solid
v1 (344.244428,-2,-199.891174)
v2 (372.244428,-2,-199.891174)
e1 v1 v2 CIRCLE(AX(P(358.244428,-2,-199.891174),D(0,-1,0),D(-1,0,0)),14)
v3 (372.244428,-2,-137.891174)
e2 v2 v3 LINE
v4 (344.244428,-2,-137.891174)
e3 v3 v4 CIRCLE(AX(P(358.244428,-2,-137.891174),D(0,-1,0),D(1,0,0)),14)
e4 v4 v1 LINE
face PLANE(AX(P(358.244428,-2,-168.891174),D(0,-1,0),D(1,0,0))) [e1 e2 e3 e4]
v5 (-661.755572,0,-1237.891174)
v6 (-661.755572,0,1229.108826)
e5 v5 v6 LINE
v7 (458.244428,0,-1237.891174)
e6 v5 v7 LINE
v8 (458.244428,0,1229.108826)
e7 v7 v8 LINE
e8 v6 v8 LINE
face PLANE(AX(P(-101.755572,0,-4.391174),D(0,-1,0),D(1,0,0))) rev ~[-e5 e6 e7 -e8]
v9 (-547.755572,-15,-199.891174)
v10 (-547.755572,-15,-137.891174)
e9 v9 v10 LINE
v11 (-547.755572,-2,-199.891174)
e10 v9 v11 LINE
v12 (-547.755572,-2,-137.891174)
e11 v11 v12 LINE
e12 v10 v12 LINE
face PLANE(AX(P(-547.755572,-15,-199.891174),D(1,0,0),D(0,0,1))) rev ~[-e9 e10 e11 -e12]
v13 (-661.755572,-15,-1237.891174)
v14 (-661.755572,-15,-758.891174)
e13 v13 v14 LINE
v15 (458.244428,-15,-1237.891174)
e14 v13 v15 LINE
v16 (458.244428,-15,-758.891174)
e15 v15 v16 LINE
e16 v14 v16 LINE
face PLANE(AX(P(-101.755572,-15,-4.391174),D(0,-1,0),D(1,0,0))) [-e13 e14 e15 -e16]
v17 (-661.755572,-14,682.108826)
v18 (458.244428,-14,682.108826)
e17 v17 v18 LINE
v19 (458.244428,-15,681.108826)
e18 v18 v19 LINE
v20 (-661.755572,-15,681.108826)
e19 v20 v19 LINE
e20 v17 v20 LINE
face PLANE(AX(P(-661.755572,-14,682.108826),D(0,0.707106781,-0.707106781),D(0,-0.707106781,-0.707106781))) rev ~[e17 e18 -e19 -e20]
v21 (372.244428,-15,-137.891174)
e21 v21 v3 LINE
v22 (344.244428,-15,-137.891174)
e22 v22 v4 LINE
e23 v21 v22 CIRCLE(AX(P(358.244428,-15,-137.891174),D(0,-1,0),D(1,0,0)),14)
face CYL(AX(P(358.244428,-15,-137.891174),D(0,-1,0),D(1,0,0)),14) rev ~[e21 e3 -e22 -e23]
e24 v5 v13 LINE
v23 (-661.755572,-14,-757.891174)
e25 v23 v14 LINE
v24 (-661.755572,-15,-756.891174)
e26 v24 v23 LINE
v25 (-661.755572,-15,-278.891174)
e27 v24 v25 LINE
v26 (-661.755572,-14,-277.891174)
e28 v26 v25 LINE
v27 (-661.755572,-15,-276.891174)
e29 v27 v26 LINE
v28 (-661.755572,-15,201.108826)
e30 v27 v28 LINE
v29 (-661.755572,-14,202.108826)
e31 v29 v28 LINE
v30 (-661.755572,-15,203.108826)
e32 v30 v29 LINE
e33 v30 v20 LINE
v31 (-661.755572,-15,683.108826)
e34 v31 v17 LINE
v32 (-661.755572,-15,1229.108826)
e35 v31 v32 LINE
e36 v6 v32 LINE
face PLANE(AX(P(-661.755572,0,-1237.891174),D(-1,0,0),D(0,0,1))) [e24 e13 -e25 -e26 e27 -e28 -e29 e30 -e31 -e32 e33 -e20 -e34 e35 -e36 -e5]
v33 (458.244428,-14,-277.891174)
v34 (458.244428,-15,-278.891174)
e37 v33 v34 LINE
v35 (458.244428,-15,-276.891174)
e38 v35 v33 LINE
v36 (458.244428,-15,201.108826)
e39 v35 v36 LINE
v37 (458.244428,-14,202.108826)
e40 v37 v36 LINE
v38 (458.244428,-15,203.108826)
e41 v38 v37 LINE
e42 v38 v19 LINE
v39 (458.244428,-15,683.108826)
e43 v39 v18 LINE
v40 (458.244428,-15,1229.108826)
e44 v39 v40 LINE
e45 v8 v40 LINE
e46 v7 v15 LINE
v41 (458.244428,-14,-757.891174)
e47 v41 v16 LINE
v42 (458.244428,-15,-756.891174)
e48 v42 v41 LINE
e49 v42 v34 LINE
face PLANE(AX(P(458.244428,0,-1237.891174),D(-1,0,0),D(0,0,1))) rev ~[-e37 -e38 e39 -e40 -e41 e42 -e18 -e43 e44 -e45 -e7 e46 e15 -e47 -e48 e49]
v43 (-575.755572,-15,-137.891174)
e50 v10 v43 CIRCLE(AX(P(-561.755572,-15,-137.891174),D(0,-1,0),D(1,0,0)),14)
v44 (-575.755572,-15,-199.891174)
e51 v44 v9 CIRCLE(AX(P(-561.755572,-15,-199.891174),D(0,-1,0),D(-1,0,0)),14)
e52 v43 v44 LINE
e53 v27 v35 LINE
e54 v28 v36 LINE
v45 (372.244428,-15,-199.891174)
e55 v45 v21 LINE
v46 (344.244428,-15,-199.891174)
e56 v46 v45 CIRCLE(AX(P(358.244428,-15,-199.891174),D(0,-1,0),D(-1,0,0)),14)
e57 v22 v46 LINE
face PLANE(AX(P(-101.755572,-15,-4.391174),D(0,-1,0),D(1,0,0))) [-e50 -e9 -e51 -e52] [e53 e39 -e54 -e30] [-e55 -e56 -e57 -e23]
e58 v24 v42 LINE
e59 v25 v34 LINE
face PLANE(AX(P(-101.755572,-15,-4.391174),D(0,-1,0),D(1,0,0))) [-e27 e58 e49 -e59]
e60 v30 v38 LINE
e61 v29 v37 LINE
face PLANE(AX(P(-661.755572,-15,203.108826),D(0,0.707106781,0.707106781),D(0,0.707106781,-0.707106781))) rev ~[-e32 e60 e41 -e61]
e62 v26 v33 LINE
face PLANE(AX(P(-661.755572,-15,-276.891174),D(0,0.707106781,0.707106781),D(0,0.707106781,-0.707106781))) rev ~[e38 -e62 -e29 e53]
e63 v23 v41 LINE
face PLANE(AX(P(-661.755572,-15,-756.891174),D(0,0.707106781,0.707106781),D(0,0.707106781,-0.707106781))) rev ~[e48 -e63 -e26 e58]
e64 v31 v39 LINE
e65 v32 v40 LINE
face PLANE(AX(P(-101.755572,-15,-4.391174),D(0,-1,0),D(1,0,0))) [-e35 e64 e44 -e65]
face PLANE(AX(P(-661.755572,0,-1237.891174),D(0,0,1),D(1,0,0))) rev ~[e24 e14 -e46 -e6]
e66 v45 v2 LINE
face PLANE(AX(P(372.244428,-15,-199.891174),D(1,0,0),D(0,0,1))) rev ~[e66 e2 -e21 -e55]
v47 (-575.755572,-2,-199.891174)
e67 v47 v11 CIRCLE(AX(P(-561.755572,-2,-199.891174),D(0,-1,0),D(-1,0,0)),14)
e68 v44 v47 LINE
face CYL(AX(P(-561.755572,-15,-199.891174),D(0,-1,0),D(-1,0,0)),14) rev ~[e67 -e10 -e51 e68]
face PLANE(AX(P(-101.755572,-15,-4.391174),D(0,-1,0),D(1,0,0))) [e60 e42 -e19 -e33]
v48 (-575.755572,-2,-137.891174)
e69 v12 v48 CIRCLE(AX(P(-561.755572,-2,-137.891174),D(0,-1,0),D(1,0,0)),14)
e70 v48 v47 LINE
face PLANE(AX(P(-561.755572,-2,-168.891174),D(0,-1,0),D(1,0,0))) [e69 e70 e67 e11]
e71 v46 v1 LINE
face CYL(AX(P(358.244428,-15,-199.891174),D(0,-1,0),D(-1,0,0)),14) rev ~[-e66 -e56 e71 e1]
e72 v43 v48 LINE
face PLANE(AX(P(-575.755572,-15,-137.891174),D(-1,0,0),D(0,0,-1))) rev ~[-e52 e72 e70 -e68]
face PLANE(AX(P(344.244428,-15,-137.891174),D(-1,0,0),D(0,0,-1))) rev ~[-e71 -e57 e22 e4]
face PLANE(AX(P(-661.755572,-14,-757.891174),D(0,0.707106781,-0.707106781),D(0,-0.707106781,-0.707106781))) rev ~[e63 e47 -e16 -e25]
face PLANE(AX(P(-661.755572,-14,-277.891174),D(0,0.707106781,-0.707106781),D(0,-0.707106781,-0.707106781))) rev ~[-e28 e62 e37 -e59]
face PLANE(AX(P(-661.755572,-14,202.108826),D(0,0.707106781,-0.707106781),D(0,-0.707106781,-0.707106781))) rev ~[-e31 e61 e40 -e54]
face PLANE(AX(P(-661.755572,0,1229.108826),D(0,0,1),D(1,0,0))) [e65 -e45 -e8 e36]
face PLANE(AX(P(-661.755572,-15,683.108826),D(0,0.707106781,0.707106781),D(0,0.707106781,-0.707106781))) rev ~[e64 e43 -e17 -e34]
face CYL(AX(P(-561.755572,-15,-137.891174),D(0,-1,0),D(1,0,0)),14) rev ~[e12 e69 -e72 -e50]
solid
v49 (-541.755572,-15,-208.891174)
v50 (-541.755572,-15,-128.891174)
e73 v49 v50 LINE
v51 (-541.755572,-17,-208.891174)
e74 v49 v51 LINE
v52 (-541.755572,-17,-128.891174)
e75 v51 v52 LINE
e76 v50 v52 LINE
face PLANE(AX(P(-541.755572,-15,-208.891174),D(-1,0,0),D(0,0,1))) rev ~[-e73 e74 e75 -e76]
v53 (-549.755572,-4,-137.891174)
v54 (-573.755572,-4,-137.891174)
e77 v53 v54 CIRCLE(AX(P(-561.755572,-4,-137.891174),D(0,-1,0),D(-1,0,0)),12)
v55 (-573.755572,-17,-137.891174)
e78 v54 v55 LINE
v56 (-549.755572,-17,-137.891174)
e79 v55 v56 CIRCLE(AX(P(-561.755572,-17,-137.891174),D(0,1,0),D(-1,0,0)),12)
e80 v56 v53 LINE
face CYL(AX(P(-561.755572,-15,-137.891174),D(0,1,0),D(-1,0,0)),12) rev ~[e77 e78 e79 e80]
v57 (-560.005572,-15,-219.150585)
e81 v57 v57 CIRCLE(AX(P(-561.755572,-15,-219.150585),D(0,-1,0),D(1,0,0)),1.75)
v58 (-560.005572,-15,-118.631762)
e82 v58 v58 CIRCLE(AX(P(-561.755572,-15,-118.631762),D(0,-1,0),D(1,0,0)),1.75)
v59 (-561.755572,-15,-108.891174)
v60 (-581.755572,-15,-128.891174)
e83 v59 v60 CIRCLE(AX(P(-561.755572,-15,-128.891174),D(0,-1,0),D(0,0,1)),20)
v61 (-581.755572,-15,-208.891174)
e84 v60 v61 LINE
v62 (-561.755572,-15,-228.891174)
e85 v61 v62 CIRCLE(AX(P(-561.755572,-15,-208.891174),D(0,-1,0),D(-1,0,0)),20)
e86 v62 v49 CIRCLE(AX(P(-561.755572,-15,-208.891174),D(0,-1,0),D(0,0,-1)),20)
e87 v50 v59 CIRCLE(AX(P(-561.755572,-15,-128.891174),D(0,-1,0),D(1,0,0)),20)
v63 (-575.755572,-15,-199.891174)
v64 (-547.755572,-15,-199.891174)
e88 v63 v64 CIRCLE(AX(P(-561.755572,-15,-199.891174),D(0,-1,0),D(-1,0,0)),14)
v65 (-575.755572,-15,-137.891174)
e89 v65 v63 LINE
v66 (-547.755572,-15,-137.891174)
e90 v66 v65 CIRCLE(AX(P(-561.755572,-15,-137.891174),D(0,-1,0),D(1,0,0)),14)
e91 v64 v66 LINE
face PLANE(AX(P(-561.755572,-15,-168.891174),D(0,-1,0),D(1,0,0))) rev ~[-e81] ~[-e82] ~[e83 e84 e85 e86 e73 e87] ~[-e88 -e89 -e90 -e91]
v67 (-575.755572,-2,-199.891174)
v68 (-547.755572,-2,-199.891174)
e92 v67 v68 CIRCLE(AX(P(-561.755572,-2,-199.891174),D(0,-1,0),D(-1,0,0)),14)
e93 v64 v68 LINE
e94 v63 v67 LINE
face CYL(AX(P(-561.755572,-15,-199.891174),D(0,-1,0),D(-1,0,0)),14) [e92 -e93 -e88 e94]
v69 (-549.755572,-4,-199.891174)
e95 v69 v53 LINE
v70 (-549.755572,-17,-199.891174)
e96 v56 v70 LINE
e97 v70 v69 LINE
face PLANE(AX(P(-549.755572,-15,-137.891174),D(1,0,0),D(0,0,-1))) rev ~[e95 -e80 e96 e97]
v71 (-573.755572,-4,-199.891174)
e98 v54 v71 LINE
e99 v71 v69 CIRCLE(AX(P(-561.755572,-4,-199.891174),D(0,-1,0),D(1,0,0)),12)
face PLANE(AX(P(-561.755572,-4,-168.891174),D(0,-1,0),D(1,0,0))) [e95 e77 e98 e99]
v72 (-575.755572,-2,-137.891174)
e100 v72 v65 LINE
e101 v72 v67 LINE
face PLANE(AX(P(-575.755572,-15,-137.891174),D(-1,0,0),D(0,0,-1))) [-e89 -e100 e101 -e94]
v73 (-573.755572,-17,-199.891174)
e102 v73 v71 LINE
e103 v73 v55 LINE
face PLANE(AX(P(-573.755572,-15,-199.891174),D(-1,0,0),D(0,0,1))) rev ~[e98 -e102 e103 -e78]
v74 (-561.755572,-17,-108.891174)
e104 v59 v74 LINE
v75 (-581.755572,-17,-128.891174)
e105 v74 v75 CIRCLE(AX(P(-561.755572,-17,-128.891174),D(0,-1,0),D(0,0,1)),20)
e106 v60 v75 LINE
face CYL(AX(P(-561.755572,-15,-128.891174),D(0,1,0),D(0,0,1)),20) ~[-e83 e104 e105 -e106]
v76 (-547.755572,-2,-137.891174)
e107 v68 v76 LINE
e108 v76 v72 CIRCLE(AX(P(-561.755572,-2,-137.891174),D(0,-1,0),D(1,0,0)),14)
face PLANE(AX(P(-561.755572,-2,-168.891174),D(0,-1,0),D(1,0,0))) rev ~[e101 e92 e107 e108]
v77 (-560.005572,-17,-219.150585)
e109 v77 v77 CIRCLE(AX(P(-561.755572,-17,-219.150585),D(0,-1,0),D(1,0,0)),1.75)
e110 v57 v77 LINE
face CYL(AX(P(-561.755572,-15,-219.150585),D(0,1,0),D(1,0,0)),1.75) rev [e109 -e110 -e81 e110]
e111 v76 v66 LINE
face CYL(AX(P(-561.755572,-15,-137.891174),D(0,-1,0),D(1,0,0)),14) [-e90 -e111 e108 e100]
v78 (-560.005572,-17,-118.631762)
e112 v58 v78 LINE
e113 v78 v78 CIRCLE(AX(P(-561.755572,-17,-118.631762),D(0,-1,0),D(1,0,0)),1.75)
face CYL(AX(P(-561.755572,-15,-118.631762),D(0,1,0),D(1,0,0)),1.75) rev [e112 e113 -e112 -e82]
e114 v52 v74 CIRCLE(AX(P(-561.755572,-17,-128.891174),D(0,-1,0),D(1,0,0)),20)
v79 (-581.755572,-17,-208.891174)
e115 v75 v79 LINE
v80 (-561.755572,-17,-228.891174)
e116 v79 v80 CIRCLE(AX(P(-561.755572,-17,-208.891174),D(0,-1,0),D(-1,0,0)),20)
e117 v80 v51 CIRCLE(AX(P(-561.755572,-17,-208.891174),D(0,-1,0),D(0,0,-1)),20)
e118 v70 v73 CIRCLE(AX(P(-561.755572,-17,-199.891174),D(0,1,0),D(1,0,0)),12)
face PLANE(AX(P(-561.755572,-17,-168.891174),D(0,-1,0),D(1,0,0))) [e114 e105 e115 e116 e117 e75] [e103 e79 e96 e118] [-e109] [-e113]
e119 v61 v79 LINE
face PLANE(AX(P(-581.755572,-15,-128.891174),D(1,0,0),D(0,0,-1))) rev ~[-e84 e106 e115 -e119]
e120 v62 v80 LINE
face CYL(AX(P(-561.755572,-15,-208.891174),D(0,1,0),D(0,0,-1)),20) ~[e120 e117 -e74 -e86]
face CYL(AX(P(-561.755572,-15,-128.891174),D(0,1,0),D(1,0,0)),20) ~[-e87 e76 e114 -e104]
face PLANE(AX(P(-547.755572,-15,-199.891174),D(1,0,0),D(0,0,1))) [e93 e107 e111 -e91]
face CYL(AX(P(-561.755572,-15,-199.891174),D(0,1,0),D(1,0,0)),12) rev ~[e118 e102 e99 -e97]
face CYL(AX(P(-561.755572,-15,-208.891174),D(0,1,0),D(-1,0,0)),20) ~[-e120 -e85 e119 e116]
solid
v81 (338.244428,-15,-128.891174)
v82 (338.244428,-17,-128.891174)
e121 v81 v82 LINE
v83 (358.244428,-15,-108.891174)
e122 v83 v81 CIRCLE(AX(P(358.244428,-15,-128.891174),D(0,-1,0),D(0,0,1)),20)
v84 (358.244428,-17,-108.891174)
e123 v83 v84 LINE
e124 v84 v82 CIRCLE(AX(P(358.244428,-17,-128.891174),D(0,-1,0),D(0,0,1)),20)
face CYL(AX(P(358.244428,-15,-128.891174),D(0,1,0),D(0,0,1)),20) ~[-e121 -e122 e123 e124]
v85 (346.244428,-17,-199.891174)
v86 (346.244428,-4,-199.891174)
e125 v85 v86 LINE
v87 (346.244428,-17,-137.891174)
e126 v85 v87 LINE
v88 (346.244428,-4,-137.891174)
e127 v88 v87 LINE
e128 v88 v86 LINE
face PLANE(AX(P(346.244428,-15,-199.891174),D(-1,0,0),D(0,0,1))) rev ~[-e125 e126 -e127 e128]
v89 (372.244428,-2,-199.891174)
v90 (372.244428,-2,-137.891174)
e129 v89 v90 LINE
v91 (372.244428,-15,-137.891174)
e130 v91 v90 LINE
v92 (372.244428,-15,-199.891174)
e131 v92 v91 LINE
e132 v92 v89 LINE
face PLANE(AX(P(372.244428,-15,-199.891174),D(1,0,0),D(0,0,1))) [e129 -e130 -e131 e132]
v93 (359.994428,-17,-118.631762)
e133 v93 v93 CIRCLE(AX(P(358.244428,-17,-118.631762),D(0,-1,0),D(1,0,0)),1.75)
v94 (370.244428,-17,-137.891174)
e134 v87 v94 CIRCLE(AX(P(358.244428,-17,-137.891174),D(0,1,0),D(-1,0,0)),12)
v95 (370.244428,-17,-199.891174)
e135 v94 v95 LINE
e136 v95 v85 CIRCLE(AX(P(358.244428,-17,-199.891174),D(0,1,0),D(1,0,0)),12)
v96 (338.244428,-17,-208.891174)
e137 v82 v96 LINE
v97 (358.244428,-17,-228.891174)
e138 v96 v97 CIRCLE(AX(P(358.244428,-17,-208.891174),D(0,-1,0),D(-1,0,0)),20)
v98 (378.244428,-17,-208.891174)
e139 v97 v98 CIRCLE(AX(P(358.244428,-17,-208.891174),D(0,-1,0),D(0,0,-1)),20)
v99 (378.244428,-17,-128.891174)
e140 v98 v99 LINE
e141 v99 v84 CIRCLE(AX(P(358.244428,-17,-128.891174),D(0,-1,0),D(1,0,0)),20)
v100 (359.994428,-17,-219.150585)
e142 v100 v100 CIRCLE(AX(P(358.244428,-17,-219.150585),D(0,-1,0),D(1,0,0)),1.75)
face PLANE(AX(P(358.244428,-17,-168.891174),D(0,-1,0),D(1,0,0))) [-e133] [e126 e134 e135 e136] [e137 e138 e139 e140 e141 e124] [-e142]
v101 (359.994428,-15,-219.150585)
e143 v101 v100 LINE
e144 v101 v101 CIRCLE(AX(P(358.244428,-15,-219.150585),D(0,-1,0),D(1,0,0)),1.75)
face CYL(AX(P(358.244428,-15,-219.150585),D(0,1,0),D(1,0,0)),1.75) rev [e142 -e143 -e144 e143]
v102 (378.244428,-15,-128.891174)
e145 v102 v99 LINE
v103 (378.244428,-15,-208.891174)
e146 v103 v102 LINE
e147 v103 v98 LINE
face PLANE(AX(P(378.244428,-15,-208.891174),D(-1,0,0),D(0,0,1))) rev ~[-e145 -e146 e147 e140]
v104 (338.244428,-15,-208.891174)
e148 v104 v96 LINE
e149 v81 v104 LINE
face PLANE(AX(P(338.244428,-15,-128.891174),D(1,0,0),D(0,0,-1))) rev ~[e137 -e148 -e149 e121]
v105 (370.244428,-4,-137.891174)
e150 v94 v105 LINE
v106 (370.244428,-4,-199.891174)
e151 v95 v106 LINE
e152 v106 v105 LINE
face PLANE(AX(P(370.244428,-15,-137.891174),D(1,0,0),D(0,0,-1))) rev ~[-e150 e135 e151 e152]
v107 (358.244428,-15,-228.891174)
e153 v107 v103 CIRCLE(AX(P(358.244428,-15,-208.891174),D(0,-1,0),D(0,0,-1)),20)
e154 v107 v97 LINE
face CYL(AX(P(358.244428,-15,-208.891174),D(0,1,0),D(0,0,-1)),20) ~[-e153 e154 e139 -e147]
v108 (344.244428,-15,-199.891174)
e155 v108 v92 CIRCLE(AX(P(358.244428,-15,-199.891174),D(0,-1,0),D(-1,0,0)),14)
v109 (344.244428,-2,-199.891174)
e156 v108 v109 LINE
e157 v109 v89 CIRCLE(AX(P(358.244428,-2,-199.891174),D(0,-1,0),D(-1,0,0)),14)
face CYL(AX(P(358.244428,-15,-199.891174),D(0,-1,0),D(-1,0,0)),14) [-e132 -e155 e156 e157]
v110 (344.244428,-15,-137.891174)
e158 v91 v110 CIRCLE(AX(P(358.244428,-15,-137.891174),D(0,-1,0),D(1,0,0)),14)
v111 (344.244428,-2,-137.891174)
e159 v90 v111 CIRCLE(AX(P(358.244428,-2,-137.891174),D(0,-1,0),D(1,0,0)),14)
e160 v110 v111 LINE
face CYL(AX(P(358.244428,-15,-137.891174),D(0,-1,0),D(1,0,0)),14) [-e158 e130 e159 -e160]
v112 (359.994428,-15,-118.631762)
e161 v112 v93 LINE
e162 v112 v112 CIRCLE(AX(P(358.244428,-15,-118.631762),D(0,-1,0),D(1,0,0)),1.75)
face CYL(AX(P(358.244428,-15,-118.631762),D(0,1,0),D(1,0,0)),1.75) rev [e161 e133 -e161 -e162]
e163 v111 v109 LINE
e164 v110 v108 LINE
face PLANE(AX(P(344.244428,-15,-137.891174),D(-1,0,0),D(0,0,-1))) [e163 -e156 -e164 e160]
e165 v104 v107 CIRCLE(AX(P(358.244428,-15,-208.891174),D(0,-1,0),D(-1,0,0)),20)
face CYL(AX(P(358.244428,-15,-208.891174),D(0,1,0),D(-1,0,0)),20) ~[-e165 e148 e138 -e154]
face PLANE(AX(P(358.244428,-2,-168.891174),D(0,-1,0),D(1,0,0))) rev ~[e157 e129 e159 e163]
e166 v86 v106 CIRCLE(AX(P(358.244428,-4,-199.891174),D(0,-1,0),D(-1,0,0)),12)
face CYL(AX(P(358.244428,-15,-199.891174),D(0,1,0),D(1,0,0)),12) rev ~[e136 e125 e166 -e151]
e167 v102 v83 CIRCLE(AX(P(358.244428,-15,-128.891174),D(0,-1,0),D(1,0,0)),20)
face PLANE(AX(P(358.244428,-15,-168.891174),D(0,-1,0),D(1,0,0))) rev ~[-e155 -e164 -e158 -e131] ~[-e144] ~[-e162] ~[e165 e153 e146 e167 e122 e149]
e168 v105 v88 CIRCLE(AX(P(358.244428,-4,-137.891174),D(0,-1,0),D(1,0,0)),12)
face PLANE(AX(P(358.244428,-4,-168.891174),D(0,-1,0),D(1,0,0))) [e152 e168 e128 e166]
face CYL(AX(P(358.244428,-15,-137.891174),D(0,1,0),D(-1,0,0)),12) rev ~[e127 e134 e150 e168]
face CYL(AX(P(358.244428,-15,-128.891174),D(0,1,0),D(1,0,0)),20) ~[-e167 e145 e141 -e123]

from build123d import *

# Parameters (mm, degrees)
F0_W      = 1120
F0_H      = 2467
F1_DEPTH  = 15
F3_DEPTH  = 1120.001
F5_DEPTH  = 13
F6_DEPTH  = 13
F7_START  = -11
F7_DEPTH  = 2
F4_R      = 1.75
F8_DEPTH  = 2
F9_DEPTH  = 2
F10_DEPTH = 2


with BuildPart() as f1:
    # F0 (on Front) → F1 (new body)
    with BuildSketch(Plane.XZ):
        with Locations((-101.7555719672, -4.3911735862)):
            Rectangle(F0_W, F0_H)
    extrude(amount=F1_DEPTH)

    # F2 (on face) → F3 (cut, through all)
    with BuildSketch(Plane(origin=(-661.7555719672, 0, 0), x_dir=(0, -1, 0), z_dir=(-1, 0, 0))):
        Polygon((15, -757.8911735862), (15, -756.8911735862), (14, -757.8911735862), (15, -758.8911735862), align=None)
        Polygon((15, 682.1088264138), (15, 683.1088264138), (14, 682.1088264138), (15, 681.1088264138), align=None)
        Polygon((14, -277.8911735862), (15, -278.8911735862), (15, -277.8911735862), (15, -276.8911735862), align=None)
        Polygon((14, 202.1088264138), (15, 201.1088264138), (15, 202.1088264138), (15, 203.1088264138), align=None)
    extrude(amount=-F3_DEPTH, mode=Mode.SUBTRACT)

    # F4 (on face) → F5 (cut)
    with BuildSketch(Plane.XZ.offset(15)):
        with BuildLine():
            Line((372.2444280328, -199.8911735862), (372.2444280328, -137.8911735862))
            ThreePointArc((372.2444280328, -137.8911735862), (358.2444280328, -123.8911735862), (344.2444280328, -137.8911735862))
            Line((344.2444280328, -137.8911735862), (344.2444280328, -199.8911735862))
            ThreePointArc((344.2444280328, -199.8911735862), (358.2444280328, -213.8911735862), (372.2444280328, -199.8911735862))
        make_face()
        with BuildLine():
            ThreePointArc((346.2444280328, -137.8911735862), (358.2444280328, -125.8911735862), (370.2444280328, -137.8911735862))
            Line((370.2444280328, -137.8911735862), (370.2444280328, -199.8911735862))
            ThreePointArc((370.2444280328, -199.8911735862), (358.2444280328, -211.8911735862), (346.2444280328, -199.8911735862))
            Line((346.2444280328, -199.8911735862), (346.2444280328, -137.8911735862))
        make_face(mode=Mode.SUBTRACT)
        with BuildLine():
            Line((-547.7555719672, -199.8911735862), (-547.7555719672, -137.8911735862))
            ThreePointArc((-547.7555719672, -137.8911735862), (-561.7555719672, -123.8911735862), (-575.7555719672, -137.8911735862))
            Line((-575.7555719672, -137.8911735862), (-575.7555719672, -199.8911735862))
            ThreePointArc((-575.7555719672, -199.8911735862), (-561.7555719672, -213.8911735862), (-547.7555719672, -199.8911735862))
        make_face()
        with BuildLine():
            ThreePointArc((-573.7555719672, -137.8911735862), (-561.7555719672, -125.8911735862), (-549.7555719672, -137.8911735862))
            Line((-549.7555719672, -137.8911735862), (-549.7555719672, -199.8911735862))
            ThreePointArc((-549.7555719672, -199.8911735862), (-561.7555719672, -211.8911735862), (-573.7555719672, -199.8911735862))
            Line((-573.7555719672, -199.8911735862), (-573.7555719672, -137.8911735862))
        make_face(mode=Mode.SUBTRACT)
        with BuildLine():
            Line((370.2444280328, -199.8911735862), (370.2444280328, -137.8911735862))
            ThreePointArc((370.2444280328, -137.8911735862), (358.2444280328, -125.8911735862), (346.2444280328, -137.8911735862))
            Line((346.2444280328, -137.8911735862), (346.2444280328, -199.8911735862))
            ThreePointArc((346.2444280328, -199.8911735862), (358.2444280328, -211.8911735862), (370.2444280328, -199.8911735862))
        make_face()
        with BuildLine():
            Line((-549.7555719672, -199.8911735862), (-549.7555719672, -137.8911735862))
            ThreePointArc((-549.7555719672, -137.8911735862), (-561.7555719672, -125.8911735862), (-573.7555719672, -137.8911735862))
            Line((-573.7555719672, -137.8911735862), (-573.7555719672, -199.8911735862))
            ThreePointArc((-573.7555719672, -199.8911735862), (-561.7555719672, -211.8911735862), (-549.7555719672, -199.8911735862))
        make_face()
    extrude(amount=-F5_DEPTH, mode=Mode.SUBTRACT)


with BuildPart() as f6:
    # F4 (on face) → F6 (new body)
    with BuildSketch(Plane.XZ.offset(15)):
        with BuildLine():
            Line((372.2444280328, -199.8911735862), (372.2444280328, -137.8911735862))
            ThreePointArc((372.2444280328, -137.8911735862), (358.2444280328, -123.8911735862), (344.2444280328, -137.8911735862))
            Line((344.2444280328, -137.8911735862), (344.2444280328, -199.8911735862))
            ThreePointArc((344.2444280328, -199.8911735862), (358.2444280328, -213.8911735862), (372.2444280328, -199.8911735862))
        make_face()
        with BuildLine():
            ThreePointArc((346.2444280328, -137.8911735862), (358.2444280328, -125.8911735862), (370.2444280328, -137.8911735862))
            Line((370.2444280328, -137.8911735862), (370.2444280328, -199.8911735862))
            ThreePointArc((370.2444280328, -199.8911735862), (358.2444280328, -211.8911735862), (346.2444280328, -199.8911735862))
            Line((346.2444280328, -199.8911735862), (346.2444280328, -137.8911735862))
        make_face(mode=Mode.SUBTRACT)
    extrude(amount=-F6_DEPTH)

    # F4 (on face) → F7 (join)
    with BuildSketch(Plane.XZ.offset(15).offset(F7_START)):
        with BuildLine():
            Line((370.2444280328, -199.8911735862), (370.2444280328, -137.8911735862))
            ThreePointArc((370.2444280328, -137.8911735862), (358.2444280328, -125.8911735862), (346.2444280328, -137.8911735862))
            Line((346.2444280328, -137.8911735862), (346.2444280328, -199.8911735862))
            ThreePointArc((346.2444280328, -199.8911735862), (358.2444280328, -211.8911735862), (370.2444280328, -199.8911735862))
        make_face()
    extrude(amount=-F7_DEPTH)

    # F4 (on face) → F8 (join)
    with BuildSketch(Plane.XZ.offset(15)):
        with BuildLine():
            Line((338.2444280328, -128.8911735862), (338.2444280328, -168.8911735862))
            Line((338.2444280328, -168.8911735862), (338.2444280328, -208.8911735862))
            ThreePointArc((338.2444280328, -208.8911735862), (344.1022924091, -223.03330921), (358.2444280328, -228.8911735862))
            ThreePointArc((358.2444280328, -228.8911735862), (372.3865636565, -223.03330921), (378.2444280328, -208.8911735862))
            Line((378.2444280328, -208.8911735862), (378.2444280328, -168.8911735862))
            Line((378.2444280328, -168.8911735862), (378.2444280328, -128.8911735862))
            ThreePointArc((378.2444280328, -128.8911735862), (372.3865636565, -114.7490379625), (358.2444280328, -108.8911735862))
            ThreePointArc((358.2444280328, -108.8911735862), (344.1022924091, -114.7490379625), (338.2444280328, -128.8911735862))
        make_face()
        with Locations((358.2444280328, -219.1505849063)):
            Circle(F4_R, mode=Mode.SUBTRACT)
        with BuildLine():
            ThreePointArc((344.2444280328, -137.8911735862), (358.2444280328, -123.8911735862), (372.2444280328, -137.8911735862))
            Line((372.2444280328, -137.8911735862), (372.2444280328, -199.8911735862))
            ThreePointArc((372.2444280328, -199.8911735862), (358.2444280328, -213.8911735862), (344.2444280328, -199.8911735862))
            Line((344.2444280328, -199.8911735862), (344.2444280328, -137.8911735862))
        make_face(mode=Mode.SUBTRACT)
        with Locations((358.2444280328, -118.6317622662)):
            Circle(F4_R, mode=Mode.SUBTRACT)
        with BuildLine():
            Line((372.2444280328, -199.8911735862), (372.2444280328, -137.8911735862))
            ThreePointArc((372.2444280328, -137.8911735862), (358.2444280328, -123.8911735862), (344.2444280328, -137.8911735862))
            Line((344.2444280328, -137.8911735862), (344.2444280328, -199.8911735862))
            ThreePointArc((344.2444280328, -199.8911735862), (358.2444280328, -213.8911735862), (372.2444280328, -199.8911735862))
        make_face()
        with BuildLine():
            ThreePointArc((346.2444280328, -137.8911735862), (358.2444280328, -125.8911735862), (370.2444280328, -137.8911735862))
            Line((370.2444280328, -137.8911735862), (370.2444280328, -199.8911735862))
            ThreePointArc((370.2444280328, -199.8911735862), (358.2444280328, -211.8911735862), (346.2444280328, -199.8911735862))
            Line((346.2444280328, -199.8911735862), (346.2444280328, -137.8911735862))
        make_face(mode=Mode.SUBTRACT)
    extrude(amount=F8_DEPTH)


with BuildPart() as f6b:
    # F4 (on face) → F6, piece 2 (new body)
    with BuildSketch(Plane.XZ.offset(15)):
        with BuildLine():
            Line((-547.7555719672, -199.8911735862), (-547.7555719672, -137.8911735862))
            ThreePointArc((-547.7555719672, -137.8911735862), (-561.7555719672, -123.8911735862), (-575.7555719672, -137.8911735862))
            Line((-575.7555719672, -137.8911735862), (-575.7555719672, -199.8911735862))
            ThreePointArc((-575.7555719672, -199.8911735862), (-561.7555719672, -213.8911735862), (-547.7555719672, -199.8911735862))
        make_face()
        with BuildLine():
            ThreePointArc((-573.7555719672, -137.8911735862), (-561.7555719672, -125.8911735862), (-549.7555719672, -137.8911735862))
            Line((-549.7555719672, -137.8911735862), (-549.7555719672, -199.8911735862))
            ThreePointArc((-549.7555719672, -199.8911735862), (-561.7555719672, -211.8911735862), (-573.7555719672, -199.8911735862))
            Line((-573.7555719672, -199.8911735862), (-573.7555719672, -137.8911735862))
        make_face(mode=Mode.SUBTRACT)
    extrude(amount=-F6_DEPTH)

    # F9 (add): a face of the model
    f9_faces = [f1.part.faces().sort_by_distance(p)[0] for p in [
        (-561.7555719672, -2, -168.8911735862),
    ]]
    extrude(f9_faces, amount=F9_DEPTH)

    # F4 (on face) → F10 (join)
    with BuildSketch(Plane.XZ.offset(15)):
        with BuildLine():
            Line((-581.7555719672, -128.8911735862), (-581.7555719672, -168.8911735862))
            Line((-581.7555719672, -168.8911735862), (-581.7555719672, -208.8911735862))
            ThreePointArc((-581.7555719672, -208.8911735862), (-575.8977075909, -223.03330921), (-561.7555719672, -228.8911735862))
            ThreePointArc((-561.7555719672, -228.8911735862), (-547.6134363435, -223.03330921), (-541.7555719672, -208.8911735862))
            Line((-541.7555719672, -208.8911735862), (-541.7555719672, -168.8911735862))
            Line((-541.7555719672, -168.8911735862), (-541.7555719672, -128.8911735862))
            ThreePointArc((-541.7555719672, -128.8911735862), (-547.6134363435, -114.7490379625), (-561.7555719672, -108.8911735862))
            ThreePointArc((-561.7555719672, -108.8911735862), (-575.8977075909, -114.7490379625), (-581.7555719672, -128.8911735862))
        make_face()
        with Locations((-561.7555719672, -219.1505849063)):
            Circle(F4_R, mode=Mode.SUBTRACT)
        with BuildLine():
            ThreePointArc((-575.7555719672, -137.8911735862), (-561.7555719672, -123.8911735862), (-547.7555719672, -137.8911735862))
            Line((-547.7555719672, -137.8911735862), (-547.7555719672, -199.8911735862))
            ThreePointArc((-547.7555719672, -199.8911735862), (-561.7555719672, -213.8911735862), (-575.7555719672, -199.8911735862))
            Line((-575.7555719672, -199.8911735862), (-575.7555719672, -137.8911735862))
        make_face(mode=Mode.SUBTRACT)
        with Locations((-561.7555719672, -118.6317622662)):
            Circle(F4_R, mode=Mode.SUBTRACT)
        with BuildLine():
            Line((-547.7555719672, -199.8911735862), (-547.7555719672, -137.8911735862))
            ThreePointArc((-547.7555719672, -137.8911735862), (-561.7555719672, -123.8911735862), (-575.7555719672, -137.8911735862))
            Line((-575.7555719672, -137.8911735862), (-575.7555719672, -199.8911735862))
            ThreePointArc((-575.7555719672, -199.8911735862), (-561.7555719672, -213.8911735862), (-547.7555719672, -199.8911735862))
        make_face()
        with BuildLine():
            ThreePointArc((-573.7555719672, -137.8911735862), (-561.7555719672, -125.8911735862), (-549.7555719672, -137.8911735862))
            Line((-549.7555719672, -137.8911735862), (-549.7555719672, -199.8911735862))
            ThreePointArc((-549.7555719672, -199.8911735862), (-561.7555719672, -211.8911735862), (-573.7555719672, -199.8911735862))
            Line((-573.7555719672, -199.8911735862), (-573.7555719672, -137.8911735862))
        make_face(mode=Mode.SUBTRACT)
    extrude(amount=F10_DEPTH)


solid = Compound([f1.part, f6.part, f6b.part])
